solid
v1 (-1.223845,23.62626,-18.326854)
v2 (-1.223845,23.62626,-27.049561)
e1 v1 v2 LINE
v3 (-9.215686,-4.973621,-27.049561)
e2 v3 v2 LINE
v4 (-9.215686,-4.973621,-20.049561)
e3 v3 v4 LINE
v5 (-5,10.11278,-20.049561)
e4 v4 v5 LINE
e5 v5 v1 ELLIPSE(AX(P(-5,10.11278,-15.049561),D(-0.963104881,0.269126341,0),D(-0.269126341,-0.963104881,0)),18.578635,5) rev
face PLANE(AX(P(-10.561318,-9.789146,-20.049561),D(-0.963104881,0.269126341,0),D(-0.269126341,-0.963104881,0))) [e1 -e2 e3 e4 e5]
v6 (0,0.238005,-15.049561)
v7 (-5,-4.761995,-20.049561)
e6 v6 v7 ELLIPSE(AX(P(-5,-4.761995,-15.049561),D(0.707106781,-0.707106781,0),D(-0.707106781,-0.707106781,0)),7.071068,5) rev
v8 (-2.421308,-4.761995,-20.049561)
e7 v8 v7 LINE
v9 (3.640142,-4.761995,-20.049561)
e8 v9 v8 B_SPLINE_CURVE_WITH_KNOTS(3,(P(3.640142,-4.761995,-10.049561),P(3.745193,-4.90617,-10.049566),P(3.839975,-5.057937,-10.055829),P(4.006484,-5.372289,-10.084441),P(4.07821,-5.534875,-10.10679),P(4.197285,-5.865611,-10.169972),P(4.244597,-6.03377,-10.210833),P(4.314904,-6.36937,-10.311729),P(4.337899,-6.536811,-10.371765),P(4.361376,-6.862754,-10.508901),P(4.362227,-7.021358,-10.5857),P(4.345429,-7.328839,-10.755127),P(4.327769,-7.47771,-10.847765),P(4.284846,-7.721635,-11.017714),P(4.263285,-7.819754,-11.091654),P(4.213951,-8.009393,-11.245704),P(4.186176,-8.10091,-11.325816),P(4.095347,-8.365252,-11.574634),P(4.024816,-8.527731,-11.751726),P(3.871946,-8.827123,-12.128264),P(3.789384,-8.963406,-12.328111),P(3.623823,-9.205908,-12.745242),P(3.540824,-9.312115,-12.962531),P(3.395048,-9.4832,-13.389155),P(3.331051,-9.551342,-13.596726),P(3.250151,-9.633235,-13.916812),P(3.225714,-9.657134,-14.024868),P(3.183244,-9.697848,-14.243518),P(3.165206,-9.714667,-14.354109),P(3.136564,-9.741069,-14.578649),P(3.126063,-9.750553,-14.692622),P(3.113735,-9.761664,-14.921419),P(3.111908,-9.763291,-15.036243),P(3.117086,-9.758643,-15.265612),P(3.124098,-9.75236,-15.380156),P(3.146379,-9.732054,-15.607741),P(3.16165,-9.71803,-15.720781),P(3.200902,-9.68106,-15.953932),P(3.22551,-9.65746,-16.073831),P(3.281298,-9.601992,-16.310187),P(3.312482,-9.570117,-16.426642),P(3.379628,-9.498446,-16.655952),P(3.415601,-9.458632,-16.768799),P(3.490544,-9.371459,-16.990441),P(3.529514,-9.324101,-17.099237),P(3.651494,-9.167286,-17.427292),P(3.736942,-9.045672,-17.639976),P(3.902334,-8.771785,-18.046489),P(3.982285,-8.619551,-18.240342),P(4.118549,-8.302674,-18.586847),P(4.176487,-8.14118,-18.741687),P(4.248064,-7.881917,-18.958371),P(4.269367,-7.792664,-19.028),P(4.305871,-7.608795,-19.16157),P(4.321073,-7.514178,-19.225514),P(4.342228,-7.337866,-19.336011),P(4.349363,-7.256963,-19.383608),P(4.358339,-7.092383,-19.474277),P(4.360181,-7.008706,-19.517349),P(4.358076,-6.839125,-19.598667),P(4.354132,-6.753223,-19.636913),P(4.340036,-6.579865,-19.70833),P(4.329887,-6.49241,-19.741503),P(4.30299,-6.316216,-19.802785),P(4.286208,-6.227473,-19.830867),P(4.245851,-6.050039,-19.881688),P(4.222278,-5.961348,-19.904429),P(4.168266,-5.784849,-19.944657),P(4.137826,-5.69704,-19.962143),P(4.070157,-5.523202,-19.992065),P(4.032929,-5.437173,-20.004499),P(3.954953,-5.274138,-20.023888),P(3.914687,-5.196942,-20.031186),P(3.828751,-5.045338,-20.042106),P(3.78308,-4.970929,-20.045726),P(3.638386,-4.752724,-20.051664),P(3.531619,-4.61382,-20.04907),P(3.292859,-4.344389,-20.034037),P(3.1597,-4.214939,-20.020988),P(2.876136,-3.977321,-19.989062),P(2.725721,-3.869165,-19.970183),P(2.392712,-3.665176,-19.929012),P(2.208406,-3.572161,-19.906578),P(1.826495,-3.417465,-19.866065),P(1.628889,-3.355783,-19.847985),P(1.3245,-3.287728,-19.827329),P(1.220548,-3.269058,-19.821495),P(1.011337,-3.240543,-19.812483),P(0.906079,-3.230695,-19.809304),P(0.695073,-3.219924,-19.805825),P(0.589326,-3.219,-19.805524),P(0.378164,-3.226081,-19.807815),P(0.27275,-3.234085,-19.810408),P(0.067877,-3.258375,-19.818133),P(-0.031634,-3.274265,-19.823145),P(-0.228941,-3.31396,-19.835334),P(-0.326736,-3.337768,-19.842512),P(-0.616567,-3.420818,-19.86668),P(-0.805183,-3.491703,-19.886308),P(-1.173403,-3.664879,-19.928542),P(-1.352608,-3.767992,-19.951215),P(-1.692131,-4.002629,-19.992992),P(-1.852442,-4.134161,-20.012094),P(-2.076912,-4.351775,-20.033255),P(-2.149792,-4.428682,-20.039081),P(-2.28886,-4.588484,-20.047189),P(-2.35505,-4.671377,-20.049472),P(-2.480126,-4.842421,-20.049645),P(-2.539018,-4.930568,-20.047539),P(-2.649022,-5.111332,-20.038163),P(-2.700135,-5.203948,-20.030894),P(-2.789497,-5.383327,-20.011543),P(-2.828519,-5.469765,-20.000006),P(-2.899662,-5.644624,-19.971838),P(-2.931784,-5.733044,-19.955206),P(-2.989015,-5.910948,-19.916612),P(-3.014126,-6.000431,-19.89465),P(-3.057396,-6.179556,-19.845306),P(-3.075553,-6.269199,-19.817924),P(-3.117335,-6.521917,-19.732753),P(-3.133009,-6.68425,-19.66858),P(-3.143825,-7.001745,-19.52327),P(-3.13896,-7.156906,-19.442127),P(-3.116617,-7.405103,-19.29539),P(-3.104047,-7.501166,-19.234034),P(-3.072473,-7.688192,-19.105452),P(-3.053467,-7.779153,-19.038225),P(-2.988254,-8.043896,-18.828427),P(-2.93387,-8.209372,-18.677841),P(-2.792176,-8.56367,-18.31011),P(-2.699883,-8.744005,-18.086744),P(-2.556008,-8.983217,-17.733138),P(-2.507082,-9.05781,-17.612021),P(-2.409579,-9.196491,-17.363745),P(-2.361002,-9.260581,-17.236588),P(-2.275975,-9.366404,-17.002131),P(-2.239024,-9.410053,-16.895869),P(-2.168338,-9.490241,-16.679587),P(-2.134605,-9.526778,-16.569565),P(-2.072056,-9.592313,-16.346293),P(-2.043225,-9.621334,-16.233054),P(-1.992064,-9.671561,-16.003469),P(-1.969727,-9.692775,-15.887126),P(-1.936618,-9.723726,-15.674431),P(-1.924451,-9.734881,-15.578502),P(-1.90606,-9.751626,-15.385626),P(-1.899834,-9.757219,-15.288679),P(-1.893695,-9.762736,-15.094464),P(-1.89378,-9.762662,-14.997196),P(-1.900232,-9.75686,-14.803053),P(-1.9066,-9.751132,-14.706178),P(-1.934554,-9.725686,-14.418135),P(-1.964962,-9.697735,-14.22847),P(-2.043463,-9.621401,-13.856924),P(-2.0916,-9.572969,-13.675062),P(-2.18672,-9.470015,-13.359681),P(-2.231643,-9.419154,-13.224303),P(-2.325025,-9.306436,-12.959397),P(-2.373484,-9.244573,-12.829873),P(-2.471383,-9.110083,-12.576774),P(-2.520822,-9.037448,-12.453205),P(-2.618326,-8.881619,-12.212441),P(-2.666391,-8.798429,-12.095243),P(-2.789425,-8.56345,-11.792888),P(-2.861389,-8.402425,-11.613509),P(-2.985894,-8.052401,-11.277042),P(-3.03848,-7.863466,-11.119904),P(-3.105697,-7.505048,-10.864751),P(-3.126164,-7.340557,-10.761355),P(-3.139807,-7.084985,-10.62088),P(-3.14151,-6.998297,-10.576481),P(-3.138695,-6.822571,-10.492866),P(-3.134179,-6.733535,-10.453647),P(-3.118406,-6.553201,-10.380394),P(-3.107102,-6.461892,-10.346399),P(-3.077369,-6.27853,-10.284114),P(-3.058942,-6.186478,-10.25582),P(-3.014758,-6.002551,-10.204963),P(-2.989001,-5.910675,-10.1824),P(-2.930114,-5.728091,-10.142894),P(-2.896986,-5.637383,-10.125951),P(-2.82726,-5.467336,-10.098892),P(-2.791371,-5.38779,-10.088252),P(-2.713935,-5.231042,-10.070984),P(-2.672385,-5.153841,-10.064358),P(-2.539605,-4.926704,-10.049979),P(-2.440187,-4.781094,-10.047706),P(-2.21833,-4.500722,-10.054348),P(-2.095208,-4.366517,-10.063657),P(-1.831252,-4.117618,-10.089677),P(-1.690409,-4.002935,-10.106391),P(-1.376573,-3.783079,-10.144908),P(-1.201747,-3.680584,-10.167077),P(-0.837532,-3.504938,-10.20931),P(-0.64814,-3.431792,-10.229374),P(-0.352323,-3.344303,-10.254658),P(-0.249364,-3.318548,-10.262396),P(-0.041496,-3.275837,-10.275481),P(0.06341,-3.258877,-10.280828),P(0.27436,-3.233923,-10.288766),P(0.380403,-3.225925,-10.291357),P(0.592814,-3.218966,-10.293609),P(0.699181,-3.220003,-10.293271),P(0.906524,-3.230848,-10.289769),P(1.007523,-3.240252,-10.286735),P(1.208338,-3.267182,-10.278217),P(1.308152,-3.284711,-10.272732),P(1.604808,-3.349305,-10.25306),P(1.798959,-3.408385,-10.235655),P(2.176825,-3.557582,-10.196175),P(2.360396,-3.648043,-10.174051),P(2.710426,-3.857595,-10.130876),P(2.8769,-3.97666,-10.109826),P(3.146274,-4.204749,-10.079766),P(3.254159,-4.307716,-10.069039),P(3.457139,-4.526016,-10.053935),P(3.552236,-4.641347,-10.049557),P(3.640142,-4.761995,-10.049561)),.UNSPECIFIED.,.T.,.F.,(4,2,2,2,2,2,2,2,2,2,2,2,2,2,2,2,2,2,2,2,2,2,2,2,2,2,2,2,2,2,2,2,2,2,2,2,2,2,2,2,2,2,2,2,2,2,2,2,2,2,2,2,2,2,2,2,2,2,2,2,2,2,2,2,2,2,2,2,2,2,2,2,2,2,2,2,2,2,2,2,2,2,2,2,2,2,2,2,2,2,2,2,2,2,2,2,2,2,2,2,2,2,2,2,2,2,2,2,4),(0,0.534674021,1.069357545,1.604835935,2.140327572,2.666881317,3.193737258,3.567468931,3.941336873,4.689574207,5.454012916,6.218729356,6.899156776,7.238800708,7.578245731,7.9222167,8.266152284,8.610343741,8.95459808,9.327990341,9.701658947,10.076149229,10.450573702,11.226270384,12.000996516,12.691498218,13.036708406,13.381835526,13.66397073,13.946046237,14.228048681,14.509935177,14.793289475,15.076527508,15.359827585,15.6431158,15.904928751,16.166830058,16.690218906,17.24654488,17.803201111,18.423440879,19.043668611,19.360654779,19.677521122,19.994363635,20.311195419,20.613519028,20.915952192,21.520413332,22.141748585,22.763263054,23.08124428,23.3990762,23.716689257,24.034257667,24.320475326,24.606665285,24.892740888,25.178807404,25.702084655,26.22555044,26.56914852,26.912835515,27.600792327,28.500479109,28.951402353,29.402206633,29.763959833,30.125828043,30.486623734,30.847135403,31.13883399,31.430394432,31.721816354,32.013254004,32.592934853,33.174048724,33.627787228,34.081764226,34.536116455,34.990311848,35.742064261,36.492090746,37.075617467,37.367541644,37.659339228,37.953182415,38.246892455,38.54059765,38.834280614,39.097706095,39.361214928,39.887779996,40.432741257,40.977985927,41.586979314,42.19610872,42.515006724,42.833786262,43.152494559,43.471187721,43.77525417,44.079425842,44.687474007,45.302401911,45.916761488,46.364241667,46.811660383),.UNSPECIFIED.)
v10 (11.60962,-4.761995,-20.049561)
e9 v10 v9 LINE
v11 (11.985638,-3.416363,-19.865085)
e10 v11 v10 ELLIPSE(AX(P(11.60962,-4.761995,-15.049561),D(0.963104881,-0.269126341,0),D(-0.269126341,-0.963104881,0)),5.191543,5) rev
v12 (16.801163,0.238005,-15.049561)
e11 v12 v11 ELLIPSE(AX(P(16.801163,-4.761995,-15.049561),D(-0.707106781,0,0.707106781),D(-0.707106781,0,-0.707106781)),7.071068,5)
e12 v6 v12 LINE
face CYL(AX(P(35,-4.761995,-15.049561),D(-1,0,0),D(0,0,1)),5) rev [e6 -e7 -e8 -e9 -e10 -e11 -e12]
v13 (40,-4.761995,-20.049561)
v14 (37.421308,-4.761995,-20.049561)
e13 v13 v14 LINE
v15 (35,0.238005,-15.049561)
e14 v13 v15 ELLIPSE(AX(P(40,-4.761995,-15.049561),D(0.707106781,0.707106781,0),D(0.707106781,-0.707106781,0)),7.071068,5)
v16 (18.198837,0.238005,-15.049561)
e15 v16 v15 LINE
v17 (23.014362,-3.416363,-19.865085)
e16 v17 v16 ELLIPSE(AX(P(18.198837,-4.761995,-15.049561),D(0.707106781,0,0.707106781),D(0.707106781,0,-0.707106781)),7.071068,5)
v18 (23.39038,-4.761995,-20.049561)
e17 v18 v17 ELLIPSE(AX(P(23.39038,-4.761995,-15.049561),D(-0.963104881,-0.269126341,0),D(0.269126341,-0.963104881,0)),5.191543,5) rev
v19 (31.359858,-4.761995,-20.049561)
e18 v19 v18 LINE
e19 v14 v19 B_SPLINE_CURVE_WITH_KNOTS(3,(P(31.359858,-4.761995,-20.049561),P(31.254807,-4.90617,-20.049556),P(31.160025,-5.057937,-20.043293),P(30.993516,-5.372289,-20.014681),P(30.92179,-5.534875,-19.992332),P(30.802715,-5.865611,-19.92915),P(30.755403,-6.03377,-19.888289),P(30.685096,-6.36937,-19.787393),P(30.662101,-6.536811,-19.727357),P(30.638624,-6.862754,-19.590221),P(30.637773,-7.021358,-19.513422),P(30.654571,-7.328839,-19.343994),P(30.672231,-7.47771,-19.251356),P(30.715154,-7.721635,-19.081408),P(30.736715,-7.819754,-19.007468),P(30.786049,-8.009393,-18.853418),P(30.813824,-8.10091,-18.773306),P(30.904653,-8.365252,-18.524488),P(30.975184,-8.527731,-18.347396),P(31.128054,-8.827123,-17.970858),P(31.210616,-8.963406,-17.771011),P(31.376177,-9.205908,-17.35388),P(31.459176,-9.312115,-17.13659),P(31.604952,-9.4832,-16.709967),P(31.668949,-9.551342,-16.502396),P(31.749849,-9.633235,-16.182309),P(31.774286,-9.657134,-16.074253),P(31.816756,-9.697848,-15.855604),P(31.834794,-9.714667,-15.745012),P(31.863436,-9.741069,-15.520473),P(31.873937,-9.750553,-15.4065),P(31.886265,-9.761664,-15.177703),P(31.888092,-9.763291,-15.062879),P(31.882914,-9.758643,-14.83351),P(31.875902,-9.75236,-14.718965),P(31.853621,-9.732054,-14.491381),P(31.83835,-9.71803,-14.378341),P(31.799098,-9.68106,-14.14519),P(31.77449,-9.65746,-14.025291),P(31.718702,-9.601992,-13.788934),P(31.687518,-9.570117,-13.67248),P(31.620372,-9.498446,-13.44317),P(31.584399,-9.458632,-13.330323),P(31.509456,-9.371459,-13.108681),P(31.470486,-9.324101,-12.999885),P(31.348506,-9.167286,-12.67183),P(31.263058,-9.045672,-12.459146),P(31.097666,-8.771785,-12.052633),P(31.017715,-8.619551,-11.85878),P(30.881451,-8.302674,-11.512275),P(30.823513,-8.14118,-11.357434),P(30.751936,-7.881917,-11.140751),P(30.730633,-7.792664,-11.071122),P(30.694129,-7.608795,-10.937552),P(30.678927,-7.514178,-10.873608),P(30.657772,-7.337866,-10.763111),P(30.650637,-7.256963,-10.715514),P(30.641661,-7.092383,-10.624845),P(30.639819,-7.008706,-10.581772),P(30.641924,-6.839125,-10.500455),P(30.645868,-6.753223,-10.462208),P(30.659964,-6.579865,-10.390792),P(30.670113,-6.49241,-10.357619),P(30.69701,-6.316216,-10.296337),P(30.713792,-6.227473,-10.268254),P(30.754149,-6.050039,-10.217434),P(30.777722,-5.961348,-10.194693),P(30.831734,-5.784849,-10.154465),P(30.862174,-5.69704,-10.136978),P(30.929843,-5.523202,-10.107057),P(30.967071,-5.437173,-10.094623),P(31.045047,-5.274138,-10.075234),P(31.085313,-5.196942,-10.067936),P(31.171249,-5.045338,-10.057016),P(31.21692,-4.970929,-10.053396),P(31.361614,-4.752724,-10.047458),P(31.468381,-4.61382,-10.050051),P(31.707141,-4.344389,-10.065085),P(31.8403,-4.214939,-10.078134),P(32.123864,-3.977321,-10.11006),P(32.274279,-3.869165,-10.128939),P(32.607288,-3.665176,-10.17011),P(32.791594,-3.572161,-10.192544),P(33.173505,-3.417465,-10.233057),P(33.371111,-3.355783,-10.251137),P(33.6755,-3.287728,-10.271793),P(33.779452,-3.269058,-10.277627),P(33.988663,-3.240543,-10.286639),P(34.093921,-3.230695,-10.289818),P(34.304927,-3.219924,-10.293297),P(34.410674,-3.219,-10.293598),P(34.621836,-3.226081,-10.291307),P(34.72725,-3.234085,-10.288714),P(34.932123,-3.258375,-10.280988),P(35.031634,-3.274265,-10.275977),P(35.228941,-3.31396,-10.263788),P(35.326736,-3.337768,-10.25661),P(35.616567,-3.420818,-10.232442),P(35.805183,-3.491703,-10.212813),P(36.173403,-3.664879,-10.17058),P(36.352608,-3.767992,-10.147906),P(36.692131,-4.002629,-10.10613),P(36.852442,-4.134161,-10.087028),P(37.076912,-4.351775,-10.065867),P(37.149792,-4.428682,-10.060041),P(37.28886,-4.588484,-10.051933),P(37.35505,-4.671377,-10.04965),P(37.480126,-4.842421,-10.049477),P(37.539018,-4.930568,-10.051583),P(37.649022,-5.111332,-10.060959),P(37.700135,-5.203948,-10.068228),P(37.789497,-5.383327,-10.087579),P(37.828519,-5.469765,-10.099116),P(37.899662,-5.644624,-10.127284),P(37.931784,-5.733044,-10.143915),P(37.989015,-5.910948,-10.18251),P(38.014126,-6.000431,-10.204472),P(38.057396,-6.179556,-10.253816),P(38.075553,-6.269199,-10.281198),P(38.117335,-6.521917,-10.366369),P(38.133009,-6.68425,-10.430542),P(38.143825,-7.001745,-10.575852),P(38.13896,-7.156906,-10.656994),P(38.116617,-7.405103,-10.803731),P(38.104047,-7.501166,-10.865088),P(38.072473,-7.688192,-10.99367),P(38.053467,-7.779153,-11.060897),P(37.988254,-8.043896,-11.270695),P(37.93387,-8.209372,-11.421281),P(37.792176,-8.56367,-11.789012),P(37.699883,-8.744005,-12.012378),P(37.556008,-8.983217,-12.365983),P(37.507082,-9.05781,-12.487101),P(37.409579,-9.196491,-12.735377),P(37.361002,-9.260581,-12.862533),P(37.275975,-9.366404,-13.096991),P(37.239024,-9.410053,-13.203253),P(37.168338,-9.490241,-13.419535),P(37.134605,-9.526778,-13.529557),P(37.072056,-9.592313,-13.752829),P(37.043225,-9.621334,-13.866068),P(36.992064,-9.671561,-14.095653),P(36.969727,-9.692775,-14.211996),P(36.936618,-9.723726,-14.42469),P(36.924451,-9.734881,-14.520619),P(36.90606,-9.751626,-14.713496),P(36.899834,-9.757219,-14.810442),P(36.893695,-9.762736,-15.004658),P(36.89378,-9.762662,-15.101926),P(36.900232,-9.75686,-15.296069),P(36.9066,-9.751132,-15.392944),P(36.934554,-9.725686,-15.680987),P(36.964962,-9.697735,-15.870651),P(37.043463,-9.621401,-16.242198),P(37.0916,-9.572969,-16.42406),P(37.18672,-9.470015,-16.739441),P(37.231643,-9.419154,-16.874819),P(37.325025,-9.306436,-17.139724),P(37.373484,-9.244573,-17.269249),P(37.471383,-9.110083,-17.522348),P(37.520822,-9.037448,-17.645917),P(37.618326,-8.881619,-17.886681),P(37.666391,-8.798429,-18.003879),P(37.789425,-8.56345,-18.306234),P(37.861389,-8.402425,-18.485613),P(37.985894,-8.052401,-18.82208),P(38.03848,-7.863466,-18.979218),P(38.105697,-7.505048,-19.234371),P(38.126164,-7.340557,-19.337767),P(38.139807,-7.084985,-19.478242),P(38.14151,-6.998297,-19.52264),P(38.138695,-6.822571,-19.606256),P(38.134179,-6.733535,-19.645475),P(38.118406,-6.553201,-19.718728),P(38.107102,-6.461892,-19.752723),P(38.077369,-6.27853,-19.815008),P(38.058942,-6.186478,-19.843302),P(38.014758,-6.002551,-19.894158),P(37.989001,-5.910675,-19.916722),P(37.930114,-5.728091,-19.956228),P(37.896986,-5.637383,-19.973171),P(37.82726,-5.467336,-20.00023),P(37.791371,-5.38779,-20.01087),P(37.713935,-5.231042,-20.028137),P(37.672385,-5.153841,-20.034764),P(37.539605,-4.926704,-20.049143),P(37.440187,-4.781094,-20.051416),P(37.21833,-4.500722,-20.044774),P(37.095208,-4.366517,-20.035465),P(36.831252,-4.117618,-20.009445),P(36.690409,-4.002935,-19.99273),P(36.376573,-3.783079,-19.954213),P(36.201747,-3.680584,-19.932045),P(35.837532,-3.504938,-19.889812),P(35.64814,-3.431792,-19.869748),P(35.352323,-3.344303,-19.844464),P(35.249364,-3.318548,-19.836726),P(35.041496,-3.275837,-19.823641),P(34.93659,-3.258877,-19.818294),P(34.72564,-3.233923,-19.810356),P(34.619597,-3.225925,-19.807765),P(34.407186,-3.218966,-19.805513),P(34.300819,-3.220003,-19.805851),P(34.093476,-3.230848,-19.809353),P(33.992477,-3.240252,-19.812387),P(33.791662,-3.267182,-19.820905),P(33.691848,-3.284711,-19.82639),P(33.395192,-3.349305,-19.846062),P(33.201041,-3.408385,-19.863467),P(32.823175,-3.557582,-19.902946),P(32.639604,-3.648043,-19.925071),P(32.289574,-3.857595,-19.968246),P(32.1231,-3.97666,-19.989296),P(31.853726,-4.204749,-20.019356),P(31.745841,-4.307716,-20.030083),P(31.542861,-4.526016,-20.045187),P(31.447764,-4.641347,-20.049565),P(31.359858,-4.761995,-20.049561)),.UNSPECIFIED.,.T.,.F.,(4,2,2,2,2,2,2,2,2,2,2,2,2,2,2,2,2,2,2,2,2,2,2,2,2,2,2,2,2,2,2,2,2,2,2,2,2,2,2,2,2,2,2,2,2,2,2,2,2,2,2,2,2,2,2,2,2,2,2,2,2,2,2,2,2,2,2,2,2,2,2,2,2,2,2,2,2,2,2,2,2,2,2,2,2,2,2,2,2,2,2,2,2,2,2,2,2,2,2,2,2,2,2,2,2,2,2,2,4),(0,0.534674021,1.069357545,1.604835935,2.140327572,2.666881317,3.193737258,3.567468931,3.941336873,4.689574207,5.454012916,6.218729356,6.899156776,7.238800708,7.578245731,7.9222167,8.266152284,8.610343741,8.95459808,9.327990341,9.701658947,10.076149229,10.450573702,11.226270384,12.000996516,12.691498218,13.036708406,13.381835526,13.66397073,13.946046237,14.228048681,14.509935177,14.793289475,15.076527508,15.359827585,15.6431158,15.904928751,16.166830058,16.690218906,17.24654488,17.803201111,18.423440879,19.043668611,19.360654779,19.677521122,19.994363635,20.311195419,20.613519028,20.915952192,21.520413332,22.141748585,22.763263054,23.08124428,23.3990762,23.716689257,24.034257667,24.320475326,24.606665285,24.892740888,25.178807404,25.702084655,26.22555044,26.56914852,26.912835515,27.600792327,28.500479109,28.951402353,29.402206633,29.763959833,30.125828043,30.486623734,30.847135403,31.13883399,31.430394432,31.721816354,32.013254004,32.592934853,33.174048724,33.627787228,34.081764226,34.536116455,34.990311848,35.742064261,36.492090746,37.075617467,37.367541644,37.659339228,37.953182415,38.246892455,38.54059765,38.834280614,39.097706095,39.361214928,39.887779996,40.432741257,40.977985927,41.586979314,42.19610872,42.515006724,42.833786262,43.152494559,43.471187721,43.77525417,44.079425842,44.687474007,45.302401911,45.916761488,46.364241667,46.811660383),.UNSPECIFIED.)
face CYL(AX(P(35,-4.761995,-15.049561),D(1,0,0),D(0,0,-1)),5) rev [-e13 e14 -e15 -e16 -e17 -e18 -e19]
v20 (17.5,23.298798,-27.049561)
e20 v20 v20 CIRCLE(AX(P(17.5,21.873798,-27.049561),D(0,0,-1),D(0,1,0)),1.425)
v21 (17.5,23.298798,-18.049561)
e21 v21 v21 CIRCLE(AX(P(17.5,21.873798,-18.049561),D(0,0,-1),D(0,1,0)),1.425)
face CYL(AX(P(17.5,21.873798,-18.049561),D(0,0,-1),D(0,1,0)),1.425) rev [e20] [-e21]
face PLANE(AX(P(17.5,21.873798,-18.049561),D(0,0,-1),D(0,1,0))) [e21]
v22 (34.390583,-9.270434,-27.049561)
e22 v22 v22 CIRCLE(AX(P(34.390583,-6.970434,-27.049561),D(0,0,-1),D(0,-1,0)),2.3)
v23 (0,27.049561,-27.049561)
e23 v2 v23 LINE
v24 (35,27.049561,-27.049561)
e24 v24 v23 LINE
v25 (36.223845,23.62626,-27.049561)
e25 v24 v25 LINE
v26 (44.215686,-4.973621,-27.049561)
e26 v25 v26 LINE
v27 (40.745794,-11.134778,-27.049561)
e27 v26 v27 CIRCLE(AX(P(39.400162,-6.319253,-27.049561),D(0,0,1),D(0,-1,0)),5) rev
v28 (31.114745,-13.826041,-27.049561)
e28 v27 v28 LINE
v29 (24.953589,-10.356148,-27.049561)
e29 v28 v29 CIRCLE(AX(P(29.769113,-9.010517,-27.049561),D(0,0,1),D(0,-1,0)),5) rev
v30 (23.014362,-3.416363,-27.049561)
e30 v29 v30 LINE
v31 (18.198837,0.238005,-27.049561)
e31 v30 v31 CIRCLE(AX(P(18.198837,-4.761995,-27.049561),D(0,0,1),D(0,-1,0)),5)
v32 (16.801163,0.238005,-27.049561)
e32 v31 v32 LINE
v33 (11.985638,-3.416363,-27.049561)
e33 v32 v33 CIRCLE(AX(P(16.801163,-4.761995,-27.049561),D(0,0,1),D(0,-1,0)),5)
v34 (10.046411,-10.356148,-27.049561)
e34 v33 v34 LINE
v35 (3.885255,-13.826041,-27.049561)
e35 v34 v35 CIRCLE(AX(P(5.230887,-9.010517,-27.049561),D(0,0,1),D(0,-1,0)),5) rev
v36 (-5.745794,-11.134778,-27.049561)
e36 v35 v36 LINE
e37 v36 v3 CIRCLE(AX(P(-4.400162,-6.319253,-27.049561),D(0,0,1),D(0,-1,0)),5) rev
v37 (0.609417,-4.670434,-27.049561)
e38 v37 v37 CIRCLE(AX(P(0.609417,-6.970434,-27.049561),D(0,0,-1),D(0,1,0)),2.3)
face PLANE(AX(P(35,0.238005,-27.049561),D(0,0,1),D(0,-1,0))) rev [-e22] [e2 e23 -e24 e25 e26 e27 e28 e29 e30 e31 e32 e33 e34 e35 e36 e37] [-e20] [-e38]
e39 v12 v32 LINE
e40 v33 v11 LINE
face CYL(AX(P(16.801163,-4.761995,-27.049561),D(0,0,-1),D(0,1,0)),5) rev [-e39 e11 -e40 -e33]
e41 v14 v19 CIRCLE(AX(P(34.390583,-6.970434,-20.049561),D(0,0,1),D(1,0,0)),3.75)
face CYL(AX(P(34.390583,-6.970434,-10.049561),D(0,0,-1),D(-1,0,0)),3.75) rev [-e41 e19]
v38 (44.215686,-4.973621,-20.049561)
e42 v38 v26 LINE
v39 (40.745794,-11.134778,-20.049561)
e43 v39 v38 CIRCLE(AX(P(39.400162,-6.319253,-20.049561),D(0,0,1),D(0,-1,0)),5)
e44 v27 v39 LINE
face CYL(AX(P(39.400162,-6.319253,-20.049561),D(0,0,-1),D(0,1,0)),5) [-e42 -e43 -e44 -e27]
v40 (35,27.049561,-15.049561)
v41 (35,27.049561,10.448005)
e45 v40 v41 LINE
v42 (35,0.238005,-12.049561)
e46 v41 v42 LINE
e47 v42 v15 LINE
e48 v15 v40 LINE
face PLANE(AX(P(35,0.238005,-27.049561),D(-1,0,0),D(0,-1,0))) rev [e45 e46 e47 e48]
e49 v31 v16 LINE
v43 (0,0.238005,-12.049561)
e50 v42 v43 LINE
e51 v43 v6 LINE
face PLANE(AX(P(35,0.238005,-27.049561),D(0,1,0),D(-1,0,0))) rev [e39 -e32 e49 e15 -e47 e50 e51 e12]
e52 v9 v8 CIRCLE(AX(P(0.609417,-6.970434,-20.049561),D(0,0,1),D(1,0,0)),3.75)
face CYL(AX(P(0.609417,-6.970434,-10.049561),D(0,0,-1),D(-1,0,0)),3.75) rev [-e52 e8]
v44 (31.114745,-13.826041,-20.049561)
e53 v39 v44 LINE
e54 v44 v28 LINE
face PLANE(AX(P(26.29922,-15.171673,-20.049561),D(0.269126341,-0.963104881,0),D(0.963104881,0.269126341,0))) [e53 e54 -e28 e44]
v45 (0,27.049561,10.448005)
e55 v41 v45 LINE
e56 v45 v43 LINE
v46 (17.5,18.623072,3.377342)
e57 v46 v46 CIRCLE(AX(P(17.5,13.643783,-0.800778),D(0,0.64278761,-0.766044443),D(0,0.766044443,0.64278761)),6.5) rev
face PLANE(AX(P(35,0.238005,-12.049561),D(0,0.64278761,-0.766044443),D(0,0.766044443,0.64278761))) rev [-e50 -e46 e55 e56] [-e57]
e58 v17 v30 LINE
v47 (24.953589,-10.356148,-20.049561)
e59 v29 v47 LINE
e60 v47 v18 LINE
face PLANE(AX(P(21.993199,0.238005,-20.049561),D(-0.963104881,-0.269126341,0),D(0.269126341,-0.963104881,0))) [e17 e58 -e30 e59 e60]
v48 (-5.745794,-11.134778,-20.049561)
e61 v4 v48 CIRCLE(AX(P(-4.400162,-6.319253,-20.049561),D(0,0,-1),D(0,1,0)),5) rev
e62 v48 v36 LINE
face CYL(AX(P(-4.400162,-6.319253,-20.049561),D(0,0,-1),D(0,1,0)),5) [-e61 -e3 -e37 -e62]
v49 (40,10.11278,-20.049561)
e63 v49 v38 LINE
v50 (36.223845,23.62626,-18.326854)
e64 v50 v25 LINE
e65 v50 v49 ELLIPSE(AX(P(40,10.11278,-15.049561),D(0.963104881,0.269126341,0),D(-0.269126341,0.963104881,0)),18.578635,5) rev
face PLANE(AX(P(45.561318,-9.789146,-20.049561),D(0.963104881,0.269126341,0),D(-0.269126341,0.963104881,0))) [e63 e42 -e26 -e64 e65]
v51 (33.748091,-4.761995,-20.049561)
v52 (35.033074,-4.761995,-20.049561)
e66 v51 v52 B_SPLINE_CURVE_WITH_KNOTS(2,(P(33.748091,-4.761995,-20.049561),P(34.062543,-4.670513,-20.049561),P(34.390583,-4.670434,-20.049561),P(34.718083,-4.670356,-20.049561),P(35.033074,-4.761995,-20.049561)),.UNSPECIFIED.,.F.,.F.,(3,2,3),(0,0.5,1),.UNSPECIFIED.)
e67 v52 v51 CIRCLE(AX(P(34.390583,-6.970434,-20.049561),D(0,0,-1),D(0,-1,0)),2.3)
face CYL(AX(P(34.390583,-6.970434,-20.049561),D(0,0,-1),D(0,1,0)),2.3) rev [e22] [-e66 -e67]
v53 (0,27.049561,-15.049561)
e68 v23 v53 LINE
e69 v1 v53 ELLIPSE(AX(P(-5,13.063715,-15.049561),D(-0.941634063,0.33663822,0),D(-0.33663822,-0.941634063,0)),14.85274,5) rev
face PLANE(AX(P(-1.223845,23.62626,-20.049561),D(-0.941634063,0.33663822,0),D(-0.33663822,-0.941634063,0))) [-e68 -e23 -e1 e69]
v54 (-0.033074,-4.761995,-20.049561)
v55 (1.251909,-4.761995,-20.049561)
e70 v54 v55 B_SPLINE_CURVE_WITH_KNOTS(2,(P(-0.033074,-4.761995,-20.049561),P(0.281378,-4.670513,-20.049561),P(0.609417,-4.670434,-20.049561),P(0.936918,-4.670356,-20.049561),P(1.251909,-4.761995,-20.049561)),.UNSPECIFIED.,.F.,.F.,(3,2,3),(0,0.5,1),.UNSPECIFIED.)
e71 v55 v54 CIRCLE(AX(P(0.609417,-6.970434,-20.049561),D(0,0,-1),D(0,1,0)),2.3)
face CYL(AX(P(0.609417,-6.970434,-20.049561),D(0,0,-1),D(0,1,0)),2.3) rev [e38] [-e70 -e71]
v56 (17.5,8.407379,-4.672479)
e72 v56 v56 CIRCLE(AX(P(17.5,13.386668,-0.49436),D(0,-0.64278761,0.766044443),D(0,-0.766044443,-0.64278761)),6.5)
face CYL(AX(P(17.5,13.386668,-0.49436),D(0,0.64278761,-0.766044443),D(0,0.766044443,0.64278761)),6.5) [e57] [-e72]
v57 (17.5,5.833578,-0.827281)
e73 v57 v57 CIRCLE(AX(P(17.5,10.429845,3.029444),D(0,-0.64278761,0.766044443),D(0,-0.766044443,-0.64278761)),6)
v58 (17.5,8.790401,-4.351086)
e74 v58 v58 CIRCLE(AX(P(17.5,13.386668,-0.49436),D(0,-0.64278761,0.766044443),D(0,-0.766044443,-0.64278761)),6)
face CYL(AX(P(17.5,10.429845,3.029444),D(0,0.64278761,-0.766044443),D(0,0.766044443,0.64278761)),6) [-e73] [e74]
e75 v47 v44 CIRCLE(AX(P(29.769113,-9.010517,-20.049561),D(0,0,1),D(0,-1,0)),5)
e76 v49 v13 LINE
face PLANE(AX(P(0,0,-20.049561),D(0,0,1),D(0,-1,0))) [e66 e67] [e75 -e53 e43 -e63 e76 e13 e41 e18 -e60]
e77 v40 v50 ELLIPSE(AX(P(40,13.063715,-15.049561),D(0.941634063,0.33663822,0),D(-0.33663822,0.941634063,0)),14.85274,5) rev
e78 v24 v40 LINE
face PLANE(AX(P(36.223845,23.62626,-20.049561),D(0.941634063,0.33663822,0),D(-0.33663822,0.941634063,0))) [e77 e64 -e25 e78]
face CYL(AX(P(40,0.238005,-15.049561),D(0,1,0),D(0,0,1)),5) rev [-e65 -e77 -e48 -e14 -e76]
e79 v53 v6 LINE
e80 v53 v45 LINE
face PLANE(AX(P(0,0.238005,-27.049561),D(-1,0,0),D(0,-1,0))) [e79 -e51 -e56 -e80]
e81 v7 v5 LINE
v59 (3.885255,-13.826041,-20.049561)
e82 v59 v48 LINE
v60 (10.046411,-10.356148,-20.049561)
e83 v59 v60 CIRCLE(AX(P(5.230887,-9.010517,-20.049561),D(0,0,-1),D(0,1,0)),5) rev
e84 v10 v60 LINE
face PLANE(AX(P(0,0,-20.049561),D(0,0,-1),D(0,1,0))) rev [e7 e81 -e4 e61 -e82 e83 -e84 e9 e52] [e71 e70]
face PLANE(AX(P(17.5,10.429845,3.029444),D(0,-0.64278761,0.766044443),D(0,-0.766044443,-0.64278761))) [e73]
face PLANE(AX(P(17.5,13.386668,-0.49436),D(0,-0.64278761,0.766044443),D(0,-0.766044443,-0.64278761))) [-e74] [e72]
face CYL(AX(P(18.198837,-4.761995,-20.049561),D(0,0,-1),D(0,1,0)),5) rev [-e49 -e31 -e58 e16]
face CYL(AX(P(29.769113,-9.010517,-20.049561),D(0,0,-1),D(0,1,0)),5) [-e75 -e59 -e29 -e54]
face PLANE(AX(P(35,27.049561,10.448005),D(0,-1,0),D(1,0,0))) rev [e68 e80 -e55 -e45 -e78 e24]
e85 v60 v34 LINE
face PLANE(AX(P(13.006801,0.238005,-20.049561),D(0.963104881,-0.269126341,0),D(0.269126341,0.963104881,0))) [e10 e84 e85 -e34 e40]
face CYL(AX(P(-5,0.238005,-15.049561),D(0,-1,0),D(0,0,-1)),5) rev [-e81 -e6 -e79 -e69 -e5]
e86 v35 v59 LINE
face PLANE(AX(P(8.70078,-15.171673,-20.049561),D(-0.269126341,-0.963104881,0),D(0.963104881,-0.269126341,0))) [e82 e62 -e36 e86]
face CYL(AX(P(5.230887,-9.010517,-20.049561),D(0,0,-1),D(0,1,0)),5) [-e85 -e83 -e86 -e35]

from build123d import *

# Parameters (mm, degrees)
AUFSATZ_LINEAR_AUSTRAGEN1_DEPTH    = 35
SKIZZE3_R                          = 6
AUFSATZ_LINEAR_AUSTRAGEN2_DEPTH    = 5
SKIZZE4_R                          = 6.5
AUFSATZ_LINEAR_AUSTRAGEN3_DEPTH    = 0.4
K_RPER_VERSCHIEBEN_KOPIEREN1_ANGLE = 90
SKIZZE9_R                          = 2.3
AUFSATZ_LINEAR_AUSTRAGEN4_DEPTH    = 7
VERRUNDUNG1_R                      = 5
SKIZZE11_R                         = 3.75
SCHNITT_LINEAR_AUSTRAGEN2_DEPTH    = 10
SKIZZE12_R                         = 1.425000005
SCHNITT_LINEAR_AUSTRAGEN3_DEPTH    = 9


with BuildPart() as part:
    # Skizze1 → Aufsatz-Linear austragen1 (new body)
    with BuildSketch(Plane(origin=(0, 0, 0), x_dir=(0, 0, -1), z_dir=(1, 0, 0))):
        Polygon((0, 0), (26.811555509, 0), (26.811555509, 37.497566339), (0, 15), align=None)
    extrude(amount=AUFSATZ_LINEAR_AUSTRAGEN1_DEPTH)

    # Skizze3 → Aufsatz-Linear austragen2 (add)
    with BuildSketch(Plane(origin=(0, 8.802361333, 7.386058148), x_dir=(1, 0, 0), z_dir=(0, 0.7660444431189768, 0.642787609686541))):
        with Locations(Location((17.5, 27.141814145, 0), (0, 0, 90))):
            Circle(SKIZZE3_R)
    extrude(amount=AUFSATZ_LINEAR_AUSTRAGEN2_DEPTH)

    # Skizze4 → Aufsatz-Linear austragen3 (add)
    with BuildSketch(Plane(origin=(0, 8.802361333, 7.386058148), x_dir=(1, 0, 0), z_dir=(0, 0.7660444431189767, 0.6427876096865409))):
        with Locations(Location((17.5, 27.141814145, 0), (0, 0, 90))):
            Circle(SKIZZE4_R)
    extrude(amount=AUFSATZ_LINEAR_AUSTRAGEN3_DEPTH)


with BuildPart() as part_1:
    # Körper-Verschieben/Kopieren1: moved
    add(part.part.rotate(Axis((0, 13.64378317, -13.405777755), (1, 0, 0)), K_RPER_VERSCHIEBEN_KOPIEREN1_ANGLE))

    # Skizze9 → Aufsatz-Linear austragen4 (add)
    # profile 1 of 2: a face of its own
    with BuildSketch(Plane(origin=(0, 0, -27.049560924), x_dir=(-1, 0, 0), z_dir=(0, 0, -1))):
        Polygon((-13.006801175, 0.238005415), (-8.700779715, -15.171672686), (10.561317912, -9.789145862), (1.223844944, 23.626259531), (0, 27.049560924), (0, 0.238005415), align=None)
        with Locations(Location((-0.609417277, -6.970434083, 0), (0, 0, 90))):
            Circle(SKIZZE9_R, mode=Mode.SUBTRACT)
    # profile 2 of 2: a face of its own
    with BuildSketch(Plane(origin=(0, 0, -27.049560924), x_dir=(-1, 0, 0), z_dir=(0, 0, -1))):
        Polygon((-45.561317912, -9.789145862), (-36.223844944, 23.626259531), (-35, 27.049560924), (-35, 0.238005415), (-21.993198825, 0.238005415), (-26.299220285, -15.171672686), align=None)
        with Locations(Location((-34.390582723, -6.970434083, 0), (0, 0, 270))):
            Circle(SKIZZE9_R, mode=Mode.SUBTRACT)
    extrude(amount=-AUFSATZ_LINEAR_AUSTRAGEN4_DEPTH)

    # Verrundung1
    # the kernel refuses this fillet: 5 mm, written as the material it adds along each edge
    with BuildSketch(Plane(origin=(35, 27.049560924, -20.049560924), x_dir=(1, 0, 0), z_dir=(0, -1, 0))) as verrundung1_piece_1_section:
        with BuildLine():
            CenterArc((VERRUNDUNG1_R, VERRUNDUNG1_R), VERRUNDUNG1_R, 180, 90)
            Line((0, VERRUNDUNG1_R), (-VERRUNDUNG1_R * 0.02, VERRUNDUNG1_R))
            Line((-VERRUNDUNG1_R * 0.02, VERRUNDUNG1_R), (-VERRUNDUNG1_R * 0.02, -VERRUNDUNG1_R * 0.02))
            Line((-VERRUNDUNG1_R * 0.02, -VERRUNDUNG1_R * 0.02), (VERRUNDUNG1_R, -VERRUNDUNG1_R * 0.02))
            Line((VERRUNDUNG1_R, -VERRUNDUNG1_R * 0.02), (VERRUNDUNG1_R, 0))
        make_face()
    verrundung1_piece_1 = extrude(amount=26.811555509, mode=Mode.PRIVATE)
    verrundung1_piece_1 = split(verrundung1_piece_1, bisect_by=Plane(origin=(39.17481741, 13.065806869, -18.82374956), z_dir=(-0.9631048813334838, -0.2691263412444353, -1.6244750072279728e-13)), keep=Keep.TOP, mode=Mode.PRIVATE)
    verrundung1_piece_1 = split(verrundung1_piece_1, bisect_by=Plane(origin=(39.826476164, 13.549090416, -18.82374956), z_dir=(-0.9416340631335743, -0.3366382199729496, -2.0319838344143382e-13)), keep=Keep.TOP, mode=Mode.PRIVATE)
    add(verrundung1_piece_1)
    with BuildSketch(Plane(origin=(35, 0.238005415, -20.049560924), x_dir=(0, 0, 1), z_dir=(-1, 0, 0))) as verrundung1_piece_2_section:
        with BuildLine():
            CenterArc((VERRUNDUNG1_R, -VERRUNDUNG1_R), VERRUNDUNG1_R, 90, 90)
            Line((0, -VERRUNDUNG1_R), (-VERRUNDUNG1_R * 0.02, -VERRUNDUNG1_R))
            Line((-VERRUNDUNG1_R * 0.02, -VERRUNDUNG1_R), (-VERRUNDUNG1_R * 0.02, VERRUNDUNG1_R * 0.02))
            Line((-VERRUNDUNG1_R * 0.02, VERRUNDUNG1_R * 0.02), (VERRUNDUNG1_R, VERRUNDUNG1_R * 0.02))
            Line((VERRUNDUNG1_R, VERRUNDUNG1_R * 0.02), (VERRUNDUNG1_R, 0))
        make_face()
    verrundung1_piece_2 = extrude(amount=25.506801175, mode=Mode.PRIVATE)
    verrundung1_piece_2 = split(verrundung1_piece_2, bisect_by=Plane(origin=(22.762065147, -2.513486336, -18.902354356), z_dir=(0.9631048813334842, 0.2691263412444339, 1.6244750072279647e-13)), keep=Keep.TOP, mode=Mode.PRIVATE)
    verrundung1_piece_2 = verrundung1_piece_2 - Plane(origin=(34.390582723, -6.970434083, -18.902354356), x_dir=(0, -1, 0), z_dir=(0, 0, -1)) * Cylinder(2.3, 72, mode=Mode.PRIVATE)
    add(verrundung1_piece_2)
    with BuildSketch(Plane(origin=(35, 0.238005415, -20.049560924), x_dir=(0, 0, 1), z_dir=(-1, 0, 0))) as verrundung1_piece_3_section:
        with BuildLine():
            CenterArc((VERRUNDUNG1_R, -VERRUNDUNG1_R), VERRUNDUNG1_R, 90, 90)
            Line((0, -VERRUNDUNG1_R), (-VERRUNDUNG1_R * 0.02, -VERRUNDUNG1_R))
            Line((-VERRUNDUNG1_R * 0.02, -VERRUNDUNG1_R), (-VERRUNDUNG1_R * 0.02, VERRUNDUNG1_R * 0.02))
            Line((-VERRUNDUNG1_R * 0.02, VERRUNDUNG1_R * 0.02), (VERRUNDUNG1_R, VERRUNDUNG1_R * 0.02))
            Line((VERRUNDUNG1_R, VERRUNDUNG1_R * 0.02), (VERRUNDUNG1_R, 0))
        make_face()
    verrundung1_piece_3 = extrude(amount=25.506801175, mode=Mode.PRIVATE)
    verrundung1_piece_3 = split(verrundung1_piece_3, bisect_by=Plane(origin=(12.602046932, -1.210462189, -18.857593889), z_dir=(-0.9631048813334842, 0.26912634124443413, 1.6244750072279654e-13)), keep=Keep.TOP, mode=Mode.PRIVATE)
    add(verrundung1_piece_3)
    with BuildSketch(Plane(origin=(0, 0.238005415, -20.049560924), x_dir=(0, 0, 1), z_dir=(1, 0, 0))) as verrundung1_piece_4_section:
        with BuildLine():
            CenterArc((VERRUNDUNG1_R, VERRUNDUNG1_R), VERRUNDUNG1_R, 180, 90)
            Line((0, VERRUNDUNG1_R), (-VERRUNDUNG1_R * 0.02, VERRUNDUNG1_R))
            Line((-VERRUNDUNG1_R * 0.02, VERRUNDUNG1_R), (-VERRUNDUNG1_R * 0.02, -VERRUNDUNG1_R * 0.02))
            Line((-VERRUNDUNG1_R * 0.02, -VERRUNDUNG1_R * 0.02), (VERRUNDUNG1_R, -VERRUNDUNG1_R * 0.02))
            Line((VERRUNDUNG1_R, -VERRUNDUNG1_R * 0.02), (VERRUNDUNG1_R, 0))
        make_face()
    verrundung1_piece_4 = extrude(amount=25.506801175, mode=Mode.PRIVATE)
    verrundung1_piece_4 = split(verrundung1_piece_4, bisect_by=Plane(origin=(12.237934855, -2.513486327, -18.902354361), z_dir=(-0.9631048813334842, 0.26912634124443413, 1.6244750072279654e-13)), keep=Keep.TOP, mode=Mode.PRIVATE)
    verrundung1_piece_4 = verrundung1_piece_4 - Plane(origin=(0.609417277, -6.970434083, -18.902354361), x_dir=(0, 1, 0), z_dir=(0, 0, -1)) * Cylinder(2.3, 72, mode=Mode.PRIVATE)
    add(verrundung1_piece_4)
    with BuildSketch(Plane(origin=(0, 0.238005415, -20.049560924), x_dir=(0, 0, 1), z_dir=(1, 0, 0))) as verrundung1_piece_5_section:
        with BuildLine():
            CenterArc((VERRUNDUNG1_R, VERRUNDUNG1_R), VERRUNDUNG1_R, 180, 90)
            Line((0, VERRUNDUNG1_R), (-VERRUNDUNG1_R * 0.02, VERRUNDUNG1_R))
            Line((-VERRUNDUNG1_R * 0.02, VERRUNDUNG1_R), (-VERRUNDUNG1_R * 0.02, -VERRUNDUNG1_R * 0.02))
            Line((-VERRUNDUNG1_R * 0.02, -VERRUNDUNG1_R * 0.02), (VERRUNDUNG1_R, -VERRUNDUNG1_R * 0.02))
            Line((VERRUNDUNG1_R, -VERRUNDUNG1_R * 0.02), (VERRUNDUNG1_R, 0))
        make_face()
    verrundung1_piece_5 = extrude(amount=25.506801175, mode=Mode.PRIVATE)
    verrundung1_piece_5 = split(verrundung1_piece_5, bisect_by=Plane(origin=(22.397953068, -1.210462189, -18.857593889), z_dir=(0.9631048813334842, 0.2691263412444339, 1.6244750072279647e-13)), keep=Keep.TOP, mode=Mode.PRIVATE)
    add(verrundung1_piece_5)
    with BuildSketch(Plane(origin=(0, 27.049560924, -20.049560924), x_dir=(0, 0, 1), z_dir=(0, -1, 0))) as verrundung1_piece_6_section:
        with BuildLine():
            CenterArc((VERRUNDUNG1_R, VERRUNDUNG1_R), VERRUNDUNG1_R, 180, 90)
            Line((0, VERRUNDUNG1_R), (-VERRUNDUNG1_R * 0.02, VERRUNDUNG1_R))
            Line((-VERRUNDUNG1_R * 0.02, VERRUNDUNG1_R), (-VERRUNDUNG1_R * 0.02, -VERRUNDUNG1_R * 0.02))
            Line((-VERRUNDUNG1_R * 0.02, -VERRUNDUNG1_R * 0.02), (VERRUNDUNG1_R, -VERRUNDUNG1_R * 0.02))
            Line((VERRUNDUNG1_R, -VERRUNDUNG1_R * 0.02), (VERRUNDUNG1_R, 0))
        make_face()
    verrundung1_piece_6 = extrude(amount=26.811555509, mode=Mode.PRIVATE)
    verrundung1_piece_6 = split(verrundung1_piece_6, bisect_by=Plane(origin=(-4.17481741, 13.06580687, -18.82374956), z_dir=(0.9631048813334837, -0.26912634124443535, -1.6244750072279728e-13)), keep=Keep.TOP, mode=Mode.PRIVATE)
    verrundung1_piece_6 = split(verrundung1_piece_6, bisect_by=Plane(origin=(-4.826476163, 13.549090417, -18.82374956), z_dir=(0.9416340631335748, -0.3366382199729482, -2.0319838344143293e-13)), keep=Keep.TOP, mode=Mode.PRIVATE)
    add(verrundung1_piece_6)
    with BuildSketch(Plane(origin=(21.993198825, 0.238005415, -27.049560924), x_dir=(-1, 0, 0), z_dir=(0, 0, 1))) as verrundung1_piece_7:
        with BuildLine():
            CenterArc((VERRUNDUNG1_R * 0.758872343938, VERRUNDUNG1_R), VERRUNDUNG1_R, 195.612285688, 74.387714312)
            Line((-VERRUNDUNG1_R * 0.204232537396, VERRUNDUNG1_R * 0.730873658756), (-VERRUNDUNG1_R * 0.223494635022, VERRUNDUNG1_R * 0.725491131931))
            Line((-VERRUNDUNG1_R * 0.223494635022, VERRUNDUNG1_R * 0.725491131931), (-VERRUNDUNG1_R * 0.0151774468788, -VERRUNDUNG1_R * 0.02))
            Line((-VERRUNDUNG1_R * 0.0151774468788, -VERRUNDUNG1_R * 0.02), (VERRUNDUNG1_R * 0.758872343938, -VERRUNDUNG1_R * 0.02))
            Line((VERRUNDUNG1_R * 0.758872343938, -VERRUNDUNG1_R * 0.02), (VERRUNDUNG1_R * 0.758872343938, 0))
        make_face()
    extrude(amount=7)
    with BuildSketch(Plane(origin=(13.006801175, 0.238005415, -27.049560924), x_dir=(1, 0, 0), z_dir=(0, 0, 1))) as verrundung1_piece_8:
        with BuildLine():
            CenterArc((VERRUNDUNG1_R * 0.758872343938, -VERRUNDUNG1_R), VERRUNDUNG1_R, 90, 74.387714312)
            Line((-VERRUNDUNG1_R * 0.204232537396, -VERRUNDUNG1_R * 0.730873658756), (-VERRUNDUNG1_R * 0.223494635022, -VERRUNDUNG1_R * 0.725491131931))
            Line((-VERRUNDUNG1_R * 0.223494635022, -VERRUNDUNG1_R * 0.725491131931), (-VERRUNDUNG1_R * 0.0151774468788, VERRUNDUNG1_R * 0.02))
            Line((-VERRUNDUNG1_R * 0.0151774468788, VERRUNDUNG1_R * 0.02), (VERRUNDUNG1_R * 0.758872343938, VERRUNDUNG1_R * 0.02))
            Line((VERRUNDUNG1_R * 0.758872343938, VERRUNDUNG1_R * 0.02), (VERRUNDUNG1_R * 0.758872343938, 0))
        make_face()
    extrude(amount=7)
    with BuildSketch(Plane(origin=(47.5, 0.238005415, -20.049560924), x_dir=(0, 0, 1), z_dir=(-1, 0, 0))) as verrundung1_piece_9a_section:
        with BuildLine():
            CenterArc((VERRUNDUNG1_R, -VERRUNDUNG1_R), VERRUNDUNG1_R, 90, 90)
            Line((0, -VERRUNDUNG1_R), (-VERRUNDUNG1_R * 0.02, -VERRUNDUNG1_R))
            Line((-VERRUNDUNG1_R * 0.02, -VERRUNDUNG1_R), (-VERRUNDUNG1_R * 0.02, VERRUNDUNG1_R * 0.02))
            Line((-VERRUNDUNG1_R * 0.02, VERRUNDUNG1_R * 0.02), (VERRUNDUNG1_R, VERRUNDUNG1_R * 0.02))
            Line((VERRUNDUNG1_R, VERRUNDUNG1_R * 0.02), (VERRUNDUNG1_R, 0))
        make_face()
    verrundung1_piece_9a = extrude(amount=38.006801175, mode=Mode.PRIVATE)
    verrundung1_piece_9a = split(verrundung1_piece_9a, bisect_by=Plane(origin=(35, -0.934173805, -18.941336544), z_dir=(1, 0, 0)), keep=Keep.TOP, mode=Mode.PRIVATE)
    verrundung1_piece_9a = split(verrundung1_piece_9a, bisect_by=Plane(origin=(42.794054861, 0.1138779, -18.941336544), z_dir=(-0.9631048813334838, -0.2691263412444353, -1.6244750072279728e-13)), keep=Keep.TOP, mode=Mode.PRIVATE)
    with BuildSketch(Plane(origin=(35, 27.049560924, -20.049560924), x_dir=(1, 0, 0), z_dir=(0, -1, 0))) as verrundung1_piece_9b_section:
        with BuildLine():
            CenterArc((VERRUNDUNG1_R, VERRUNDUNG1_R), VERRUNDUNG1_R, 180, 90)
            Line((0, VERRUNDUNG1_R), (-VERRUNDUNG1_R * 0.02, VERRUNDUNG1_R))
            Line((-VERRUNDUNG1_R * 0.02, VERRUNDUNG1_R), (-VERRUNDUNG1_R * 0.02, -VERRUNDUNG1_R * 0.02))
            Line((-VERRUNDUNG1_R * 0.02, -VERRUNDUNG1_R * 0.02), (VERRUNDUNG1_R, -VERRUNDUNG1_R * 0.02))
            Line((VERRUNDUNG1_R, -VERRUNDUNG1_R * 0.02), (VERRUNDUNG1_R, 0))
        make_face()
    verrundung1_piece_9b = extrude(amount=39.311555509, mode=Mode.PRIVATE)
    verrundung1_piece_9b = split(verrundung1_piece_9b, bisect_by=Plane(origin=(38.695669586, 0.238005415, -19.917388299), z_dir=(0, -1, 0)), keep=Keep.TOP, mode=Mode.PRIVATE)
    verrundung1_piece_9b = split(verrundung1_piece_9b, bisect_by=Plane(origin=(39.091980364, -11.596912781, -19.917388299), z_dir=(-0.2691263412444344, 0.963104881333484, 5.813402738026697e-13)), keep=Keep.TOP, mode=Mode.PRIVATE)
    verrundung1_piece_9b = verrundung1_piece_9b - Plane(origin=(34.390582723, -6.970434083, -19.917388299), x_dir=(0, -1, 0), z_dir=(0, 0, -1)) * Cylinder(2.3, 99, mode=Mode.PRIVATE)
    verrundung1_piece_9 = verrundung1_piece_9a & verrundung1_piece_9b
    add(verrundung1_piece_9)
    with BuildSketch(Plane(origin=(21.993198825, 0.238005415, -27.049560924), x_dir=(-1, 0, 0), z_dir=(0, 0, 1))) as verrundung1_piece_10a_section:
        with BuildLine():
            CenterArc((VERRUNDUNG1_R * 0.758872343938, VERRUNDUNG1_R), VERRUNDUNG1_R, 195.612285688, 74.387714312)
            Line((-VERRUNDUNG1_R * 0.204232537396, VERRUNDUNG1_R * 0.730873658756), (-VERRUNDUNG1_R * 0.223494635022, VERRUNDUNG1_R * 0.725491131931))
            Line((-VERRUNDUNG1_R * 0.223494635022, VERRUNDUNG1_R * 0.725491131931), (-VERRUNDUNG1_R * 0.0151774468788, -VERRUNDUNG1_R * 0.02))
            Line((-VERRUNDUNG1_R * 0.0151774468788, -VERRUNDUNG1_R * 0.02), (VERRUNDUNG1_R * 0.758872343938, -VERRUNDUNG1_R * 0.02))
            Line((VERRUNDUNG1_R * 0.758872343938, -VERRUNDUNG1_R * 0.02), (VERRUNDUNG1_R * 0.758872343938, 0))
        make_face()
    verrundung1_piece_10a = extrude(amount=16.485904299, mode=Mode.PRIVATE)
    verrundung1_piece_10a = split(verrundung1_piece_10a, bisect_by=Plane(origin=(21.313503925, -2.310633004, -14.188122481), z_dir=(0, 0.6427876096870035, -0.7660444431185887)), keep=Keep.TOP, mode=Mode.PRIVATE)
    verrundung1_piece_10a = split(verrundung1_piece_10a, bisect_by=Plane(origin=(21.313503925, -0.491782993, -20.049560924), z_dir=(0, 0, 1)), keep=Keep.TOP, mode=Mode.PRIVATE)
    with BuildSketch(Plane(origin=(35, 0.238005415, -20.049560924), x_dir=(0, 0, 1), z_dir=(-1, 0, 0))) as verrundung1_piece_10b_section:
        with BuildLine():
            CenterArc((VERRUNDUNG1_R, -VERRUNDUNG1_R), VERRUNDUNG1_R, 90, 90)
            Line((0, -VERRUNDUNG1_R), (-VERRUNDUNG1_R * 0.02, -VERRUNDUNG1_R))
            Line((-VERRUNDUNG1_R * 0.02, -VERRUNDUNG1_R), (-VERRUNDUNG1_R * 0.02, VERRUNDUNG1_R * 0.02))
            Line((-VERRUNDUNG1_R * 0.02, VERRUNDUNG1_R * 0.02), (VERRUNDUNG1_R, VERRUNDUNG1_R * 0.02))
            Line((VERRUNDUNG1_R, VERRUNDUNG1_R * 0.02), (VERRUNDUNG1_R, 0))
        make_face()
    verrundung1_piece_10b = extrude(amount=25.506801175, mode=Mode.PRIVATE)
    verrundung1_piece_10b = split(verrundung1_piece_10b, bisect_by=Plane(origin=(13.021336565, 0.290022269, -18.957466714), z_dir=(0.9631048813334842, -0.26912634124443413, -1.6244750072279654e-13)), keep=Keep.TOP, mode=Mode.PRIVATE)
    verrundung1_piece_10b = split(verrundung1_piece_10b, bisect_by=Plane(origin=(21.978663435, 0.290022269, -18.957466714), z_dir=(-0.9631048813334842, -0.2691263412444339, -1.6244750072279647e-13)), keep=Keep.TOP, mode=Mode.PRIVATE)
    verrundung1_piece_10 = verrundung1_piece_10a & verrundung1_piece_10b
    add(verrundung1_piece_10)
    with BuildSketch(Plane(origin=(-12.5, 0.238005415, -20.049560924), x_dir=(0, 0, 1), z_dir=(1, 0, 0))) as verrundung1_piece_11a_section:
        with BuildLine():
            CenterArc((VERRUNDUNG1_R, VERRUNDUNG1_R), VERRUNDUNG1_R, 180, 90)
            Line((0, VERRUNDUNG1_R), (-VERRUNDUNG1_R * 0.02, VERRUNDUNG1_R))
            Line((-VERRUNDUNG1_R * 0.02, VERRUNDUNG1_R), (-VERRUNDUNG1_R * 0.02, -VERRUNDUNG1_R * 0.02))
            Line((-VERRUNDUNG1_R * 0.02, -VERRUNDUNG1_R * 0.02), (VERRUNDUNG1_R, -VERRUNDUNG1_R * 0.02))
            Line((VERRUNDUNG1_R, -VERRUNDUNG1_R * 0.02), (VERRUNDUNG1_R, 0))
        make_face()
    verrundung1_piece_11a = extrude(amount=38.006801175, mode=Mode.PRIVATE)
    verrundung1_piece_11a = split(verrundung1_piece_11a, bisect_by=Plane(origin=(0, -0.934173805, -18.941336544), z_dir=(-1, 0, 0)), keep=Keep.TOP, mode=Mode.PRIVATE)
    verrundung1_piece_11a = split(verrundung1_piece_11a, bisect_by=Plane(origin=(-7.794054861, 0.1138779, -18.941336544), z_dir=(0.9631048813334837, -0.26912634124443535, -1.6244750072279728e-13)), keep=Keep.TOP, mode=Mode.PRIVATE)
    with BuildSketch(Plane(origin=(0, 27.049560924, -20.049560924), x_dir=(0, 0, 1), z_dir=(0, -1, 0))) as verrundung1_piece_11b_section:
        with BuildLine():
            CenterArc((VERRUNDUNG1_R, VERRUNDUNG1_R), VERRUNDUNG1_R, 180, 90)
            Line((0, VERRUNDUNG1_R), (-VERRUNDUNG1_R * 0.02, VERRUNDUNG1_R))
            Line((-VERRUNDUNG1_R * 0.02, VERRUNDUNG1_R), (-VERRUNDUNG1_R * 0.02, -VERRUNDUNG1_R * 0.02))
            Line((-VERRUNDUNG1_R * 0.02, -VERRUNDUNG1_R * 0.02), (VERRUNDUNG1_R, -VERRUNDUNG1_R * 0.02))
            Line((VERRUNDUNG1_R, -VERRUNDUNG1_R * 0.02), (VERRUNDUNG1_R, 0))
        make_face()
    verrundung1_piece_11b = extrude(amount=39.311555509, mode=Mode.PRIVATE)
    verrundung1_piece_11b = split(verrundung1_piece_11b, bisect_by=Plane(origin=(-0.132172609, 0.238005415, -16.353891343), z_dir=(0, -1, 0)), keep=Keep.TOP, mode=Mode.PRIVATE)
    verrundung1_piece_11b = split(verrundung1_piece_11b, bisect_by=Plane(origin=(-0.786583865, -12.520560126, -16.353891343), z_dir=(0.2691263412444344, 0.963104881333484, 5.813402738026697e-13)), keep=Keep.TOP, mode=Mode.PRIVATE)
    verrundung1_piece_11b = verrundung1_piece_11b - Plane(origin=(0.609417277, -6.970434083, -16.353891343), x_dir=(0, 1, 0), z_dir=(0, 0, -1)) * Cylinder(2.3, 99, mode=Mode.PRIVATE)
    verrundung1_piece_11 = verrundung1_piece_11a & verrundung1_piece_11b
    add(verrundung1_piece_11)
    with BuildSketch(Plane(origin=(0, 0.238005415, -20.049560924), x_dir=(0, 0, 1), z_dir=(1, 0, 0))) as verrundung1_piece_12a_section:
        with BuildLine():
            CenterArc((VERRUNDUNG1_R, VERRUNDUNG1_R), VERRUNDUNG1_R, 180, 90)
            Line((0, VERRUNDUNG1_R), (-VERRUNDUNG1_R * 0.02, VERRUNDUNG1_R))
            Line((-VERRUNDUNG1_R * 0.02, VERRUNDUNG1_R), (-VERRUNDUNG1_R * 0.02, -VERRUNDUNG1_R * 0.02))
            Line((-VERRUNDUNG1_R * 0.02, -VERRUNDUNG1_R * 0.02), (VERRUNDUNG1_R, -VERRUNDUNG1_R * 0.02))
            Line((VERRUNDUNG1_R, -VERRUNDUNG1_R * 0.02), (VERRUNDUNG1_R, 0))
        make_face()
    verrundung1_piece_12a = extrude(amount=25.506801175, mode=Mode.PRIVATE)
    verrundung1_piece_12a = split(verrundung1_piece_12a, bisect_by=Plane(origin=(13.021336565, 0.290022269, -18.957466714), z_dir=(0.9631048813334842, -0.26912634124443413, -1.6244750072279654e-13)), keep=Keep.TOP, mode=Mode.PRIVATE)
    verrundung1_piece_12a = split(verrundung1_piece_12a, bisect_by=Plane(origin=(21.978663435, 0.290022269, -18.957466714), z_dir=(-0.9631048813334842, -0.2691263412444339, -1.6244750072279647e-13)), keep=Keep.TOP, mode=Mode.PRIVATE)
    with BuildSketch(Plane(origin=(13.006801175, 0.238005415, -27.049560924), x_dir=(1, 0, 0), z_dir=(0, 0, 1))) as verrundung1_piece_12b_section:
        with BuildLine():
            CenterArc((VERRUNDUNG1_R * 0.758872343938, -VERRUNDUNG1_R), VERRUNDUNG1_R, 90, 74.387714312)
            Line((-VERRUNDUNG1_R * 0.204232537396, -VERRUNDUNG1_R * 0.730873658756), (-VERRUNDUNG1_R * 0.223494635022, -VERRUNDUNG1_R * 0.725491131931))
            Line((-VERRUNDUNG1_R * 0.223494635022, -VERRUNDUNG1_R * 0.725491131931), (-VERRUNDUNG1_R * 0.0151774468788, VERRUNDUNG1_R * 0.02))
            Line((-VERRUNDUNG1_R * 0.0151774468788, VERRUNDUNG1_R * 0.02), (VERRUNDUNG1_R * 0.758872343938, VERRUNDUNG1_R * 0.02))
            Line((VERRUNDUNG1_R * 0.758872343938, VERRUNDUNG1_R * 0.02), (VERRUNDUNG1_R * 0.758872343938, 0))
        make_face()
    verrundung1_piece_12b = extrude(amount=16.485904299, mode=Mode.PRIVATE)
    verrundung1_piece_12b = split(verrundung1_piece_12b, bisect_by=Plane(origin=(13.686496075, -2.310633004, -14.188122481), z_dir=(0, 0.6427876096870035, -0.7660444431185887)), keep=Keep.TOP, mode=Mode.PRIVATE)
    verrundung1_piece_12b = split(verrundung1_piece_12b, bisect_by=Plane(origin=(13.686496075, -0.491782993, -20.049560924), z_dir=(0, 0, 1)), keep=Keep.TOP, mode=Mode.PRIVATE)
    verrundung1_piece_12 = verrundung1_piece_12a & verrundung1_piece_12b
    add(verrundung1_piece_12)
    # the kernel refuses this fillet: 5 mm, written as the material it takes off along each edge
    with BuildSketch(Plane(origin=(45.561317912, -9.789145861, -39.549560924), x_dir=(-0.2691263412444356, 0.9631048813334836, 5.813402738026695e-13), z_dir=(0, 0, 1)), Plane(origin=(26.299220285, -15.171672686, -39.549560924), x_dir=(0.9631048813334839, 0.2691263412444345, 1.6244750072279685e-13), z_dir=(0, 0, 1)), Plane(origin=(8.700779715, -15.171672686, -39.549560924), x_dir=(0.2691263412444342, 0.9631048813334839, 5.813402738026696e-13), z_dir=(0, 0, 1)), Plane(origin=(-10.561317912, -9.789145861, -39.549560924), x_dir=(0.9631048813334839, -0.2691263412444345, -1.6244750072279685e-13), z_dir=(0, 0, 1))) as verrundung1_2_piece_1:
        with BuildLine():
            CenterArc((VERRUNDUNG1_R, VERRUNDUNG1_R), VERRUNDUNG1_R, 180, 90)
            Line((0, VERRUNDUNG1_R), (-VERRUNDUNG1_R * 0.02, VERRUNDUNG1_R))
            Line((-VERRUNDUNG1_R * 0.02, VERRUNDUNG1_R), (-VERRUNDUNG1_R * 0.02, -VERRUNDUNG1_R * 0.02))
            Line((-VERRUNDUNG1_R * 0.02, -VERRUNDUNG1_R * 0.02), (VERRUNDUNG1_R, -VERRUNDUNG1_R * 0.02))
            Line((VERRUNDUNG1_R, -VERRUNDUNG1_R * 0.02), (VERRUNDUNG1_R, 0))
        make_face()
    extrude(amount=32, mode=Mode.SUBTRACT)

    # Skizze11 → Schnitt-Linear austragen2 (cut)
    with BuildSketch(Plane.XY.offset(-20.049560924)):
        with Locations((0.609417277, -6.970434083)):
            Circle(SKIZZE11_R)
        with Locations((34.390582723, -6.970434083)):
            Circle(SKIZZE11_R)
    extrude(amount=SCHNITT_LINEAR_AUSTRAGEN2_DEPTH, mode=Mode.SUBTRACT)

    # Skizze12 → Schnitt-Linear austragen3 (cut)
    with BuildSketch(Plane(origin=(0, 0, -27.049560924), x_dir=(-1, 0, 0), z_dir=(0, 0, -1))):
        with Locations(Location((-17.500000004, 21.873797796, 0), (0, 0, 90))):
            Circle(SKIZZE12_R)
    extrude(amount=-SCHNITT_LINEAR_AUSTRAGEN3_DEPTH, mode=Mode.SUBTRACT)


solid = part_1.part
